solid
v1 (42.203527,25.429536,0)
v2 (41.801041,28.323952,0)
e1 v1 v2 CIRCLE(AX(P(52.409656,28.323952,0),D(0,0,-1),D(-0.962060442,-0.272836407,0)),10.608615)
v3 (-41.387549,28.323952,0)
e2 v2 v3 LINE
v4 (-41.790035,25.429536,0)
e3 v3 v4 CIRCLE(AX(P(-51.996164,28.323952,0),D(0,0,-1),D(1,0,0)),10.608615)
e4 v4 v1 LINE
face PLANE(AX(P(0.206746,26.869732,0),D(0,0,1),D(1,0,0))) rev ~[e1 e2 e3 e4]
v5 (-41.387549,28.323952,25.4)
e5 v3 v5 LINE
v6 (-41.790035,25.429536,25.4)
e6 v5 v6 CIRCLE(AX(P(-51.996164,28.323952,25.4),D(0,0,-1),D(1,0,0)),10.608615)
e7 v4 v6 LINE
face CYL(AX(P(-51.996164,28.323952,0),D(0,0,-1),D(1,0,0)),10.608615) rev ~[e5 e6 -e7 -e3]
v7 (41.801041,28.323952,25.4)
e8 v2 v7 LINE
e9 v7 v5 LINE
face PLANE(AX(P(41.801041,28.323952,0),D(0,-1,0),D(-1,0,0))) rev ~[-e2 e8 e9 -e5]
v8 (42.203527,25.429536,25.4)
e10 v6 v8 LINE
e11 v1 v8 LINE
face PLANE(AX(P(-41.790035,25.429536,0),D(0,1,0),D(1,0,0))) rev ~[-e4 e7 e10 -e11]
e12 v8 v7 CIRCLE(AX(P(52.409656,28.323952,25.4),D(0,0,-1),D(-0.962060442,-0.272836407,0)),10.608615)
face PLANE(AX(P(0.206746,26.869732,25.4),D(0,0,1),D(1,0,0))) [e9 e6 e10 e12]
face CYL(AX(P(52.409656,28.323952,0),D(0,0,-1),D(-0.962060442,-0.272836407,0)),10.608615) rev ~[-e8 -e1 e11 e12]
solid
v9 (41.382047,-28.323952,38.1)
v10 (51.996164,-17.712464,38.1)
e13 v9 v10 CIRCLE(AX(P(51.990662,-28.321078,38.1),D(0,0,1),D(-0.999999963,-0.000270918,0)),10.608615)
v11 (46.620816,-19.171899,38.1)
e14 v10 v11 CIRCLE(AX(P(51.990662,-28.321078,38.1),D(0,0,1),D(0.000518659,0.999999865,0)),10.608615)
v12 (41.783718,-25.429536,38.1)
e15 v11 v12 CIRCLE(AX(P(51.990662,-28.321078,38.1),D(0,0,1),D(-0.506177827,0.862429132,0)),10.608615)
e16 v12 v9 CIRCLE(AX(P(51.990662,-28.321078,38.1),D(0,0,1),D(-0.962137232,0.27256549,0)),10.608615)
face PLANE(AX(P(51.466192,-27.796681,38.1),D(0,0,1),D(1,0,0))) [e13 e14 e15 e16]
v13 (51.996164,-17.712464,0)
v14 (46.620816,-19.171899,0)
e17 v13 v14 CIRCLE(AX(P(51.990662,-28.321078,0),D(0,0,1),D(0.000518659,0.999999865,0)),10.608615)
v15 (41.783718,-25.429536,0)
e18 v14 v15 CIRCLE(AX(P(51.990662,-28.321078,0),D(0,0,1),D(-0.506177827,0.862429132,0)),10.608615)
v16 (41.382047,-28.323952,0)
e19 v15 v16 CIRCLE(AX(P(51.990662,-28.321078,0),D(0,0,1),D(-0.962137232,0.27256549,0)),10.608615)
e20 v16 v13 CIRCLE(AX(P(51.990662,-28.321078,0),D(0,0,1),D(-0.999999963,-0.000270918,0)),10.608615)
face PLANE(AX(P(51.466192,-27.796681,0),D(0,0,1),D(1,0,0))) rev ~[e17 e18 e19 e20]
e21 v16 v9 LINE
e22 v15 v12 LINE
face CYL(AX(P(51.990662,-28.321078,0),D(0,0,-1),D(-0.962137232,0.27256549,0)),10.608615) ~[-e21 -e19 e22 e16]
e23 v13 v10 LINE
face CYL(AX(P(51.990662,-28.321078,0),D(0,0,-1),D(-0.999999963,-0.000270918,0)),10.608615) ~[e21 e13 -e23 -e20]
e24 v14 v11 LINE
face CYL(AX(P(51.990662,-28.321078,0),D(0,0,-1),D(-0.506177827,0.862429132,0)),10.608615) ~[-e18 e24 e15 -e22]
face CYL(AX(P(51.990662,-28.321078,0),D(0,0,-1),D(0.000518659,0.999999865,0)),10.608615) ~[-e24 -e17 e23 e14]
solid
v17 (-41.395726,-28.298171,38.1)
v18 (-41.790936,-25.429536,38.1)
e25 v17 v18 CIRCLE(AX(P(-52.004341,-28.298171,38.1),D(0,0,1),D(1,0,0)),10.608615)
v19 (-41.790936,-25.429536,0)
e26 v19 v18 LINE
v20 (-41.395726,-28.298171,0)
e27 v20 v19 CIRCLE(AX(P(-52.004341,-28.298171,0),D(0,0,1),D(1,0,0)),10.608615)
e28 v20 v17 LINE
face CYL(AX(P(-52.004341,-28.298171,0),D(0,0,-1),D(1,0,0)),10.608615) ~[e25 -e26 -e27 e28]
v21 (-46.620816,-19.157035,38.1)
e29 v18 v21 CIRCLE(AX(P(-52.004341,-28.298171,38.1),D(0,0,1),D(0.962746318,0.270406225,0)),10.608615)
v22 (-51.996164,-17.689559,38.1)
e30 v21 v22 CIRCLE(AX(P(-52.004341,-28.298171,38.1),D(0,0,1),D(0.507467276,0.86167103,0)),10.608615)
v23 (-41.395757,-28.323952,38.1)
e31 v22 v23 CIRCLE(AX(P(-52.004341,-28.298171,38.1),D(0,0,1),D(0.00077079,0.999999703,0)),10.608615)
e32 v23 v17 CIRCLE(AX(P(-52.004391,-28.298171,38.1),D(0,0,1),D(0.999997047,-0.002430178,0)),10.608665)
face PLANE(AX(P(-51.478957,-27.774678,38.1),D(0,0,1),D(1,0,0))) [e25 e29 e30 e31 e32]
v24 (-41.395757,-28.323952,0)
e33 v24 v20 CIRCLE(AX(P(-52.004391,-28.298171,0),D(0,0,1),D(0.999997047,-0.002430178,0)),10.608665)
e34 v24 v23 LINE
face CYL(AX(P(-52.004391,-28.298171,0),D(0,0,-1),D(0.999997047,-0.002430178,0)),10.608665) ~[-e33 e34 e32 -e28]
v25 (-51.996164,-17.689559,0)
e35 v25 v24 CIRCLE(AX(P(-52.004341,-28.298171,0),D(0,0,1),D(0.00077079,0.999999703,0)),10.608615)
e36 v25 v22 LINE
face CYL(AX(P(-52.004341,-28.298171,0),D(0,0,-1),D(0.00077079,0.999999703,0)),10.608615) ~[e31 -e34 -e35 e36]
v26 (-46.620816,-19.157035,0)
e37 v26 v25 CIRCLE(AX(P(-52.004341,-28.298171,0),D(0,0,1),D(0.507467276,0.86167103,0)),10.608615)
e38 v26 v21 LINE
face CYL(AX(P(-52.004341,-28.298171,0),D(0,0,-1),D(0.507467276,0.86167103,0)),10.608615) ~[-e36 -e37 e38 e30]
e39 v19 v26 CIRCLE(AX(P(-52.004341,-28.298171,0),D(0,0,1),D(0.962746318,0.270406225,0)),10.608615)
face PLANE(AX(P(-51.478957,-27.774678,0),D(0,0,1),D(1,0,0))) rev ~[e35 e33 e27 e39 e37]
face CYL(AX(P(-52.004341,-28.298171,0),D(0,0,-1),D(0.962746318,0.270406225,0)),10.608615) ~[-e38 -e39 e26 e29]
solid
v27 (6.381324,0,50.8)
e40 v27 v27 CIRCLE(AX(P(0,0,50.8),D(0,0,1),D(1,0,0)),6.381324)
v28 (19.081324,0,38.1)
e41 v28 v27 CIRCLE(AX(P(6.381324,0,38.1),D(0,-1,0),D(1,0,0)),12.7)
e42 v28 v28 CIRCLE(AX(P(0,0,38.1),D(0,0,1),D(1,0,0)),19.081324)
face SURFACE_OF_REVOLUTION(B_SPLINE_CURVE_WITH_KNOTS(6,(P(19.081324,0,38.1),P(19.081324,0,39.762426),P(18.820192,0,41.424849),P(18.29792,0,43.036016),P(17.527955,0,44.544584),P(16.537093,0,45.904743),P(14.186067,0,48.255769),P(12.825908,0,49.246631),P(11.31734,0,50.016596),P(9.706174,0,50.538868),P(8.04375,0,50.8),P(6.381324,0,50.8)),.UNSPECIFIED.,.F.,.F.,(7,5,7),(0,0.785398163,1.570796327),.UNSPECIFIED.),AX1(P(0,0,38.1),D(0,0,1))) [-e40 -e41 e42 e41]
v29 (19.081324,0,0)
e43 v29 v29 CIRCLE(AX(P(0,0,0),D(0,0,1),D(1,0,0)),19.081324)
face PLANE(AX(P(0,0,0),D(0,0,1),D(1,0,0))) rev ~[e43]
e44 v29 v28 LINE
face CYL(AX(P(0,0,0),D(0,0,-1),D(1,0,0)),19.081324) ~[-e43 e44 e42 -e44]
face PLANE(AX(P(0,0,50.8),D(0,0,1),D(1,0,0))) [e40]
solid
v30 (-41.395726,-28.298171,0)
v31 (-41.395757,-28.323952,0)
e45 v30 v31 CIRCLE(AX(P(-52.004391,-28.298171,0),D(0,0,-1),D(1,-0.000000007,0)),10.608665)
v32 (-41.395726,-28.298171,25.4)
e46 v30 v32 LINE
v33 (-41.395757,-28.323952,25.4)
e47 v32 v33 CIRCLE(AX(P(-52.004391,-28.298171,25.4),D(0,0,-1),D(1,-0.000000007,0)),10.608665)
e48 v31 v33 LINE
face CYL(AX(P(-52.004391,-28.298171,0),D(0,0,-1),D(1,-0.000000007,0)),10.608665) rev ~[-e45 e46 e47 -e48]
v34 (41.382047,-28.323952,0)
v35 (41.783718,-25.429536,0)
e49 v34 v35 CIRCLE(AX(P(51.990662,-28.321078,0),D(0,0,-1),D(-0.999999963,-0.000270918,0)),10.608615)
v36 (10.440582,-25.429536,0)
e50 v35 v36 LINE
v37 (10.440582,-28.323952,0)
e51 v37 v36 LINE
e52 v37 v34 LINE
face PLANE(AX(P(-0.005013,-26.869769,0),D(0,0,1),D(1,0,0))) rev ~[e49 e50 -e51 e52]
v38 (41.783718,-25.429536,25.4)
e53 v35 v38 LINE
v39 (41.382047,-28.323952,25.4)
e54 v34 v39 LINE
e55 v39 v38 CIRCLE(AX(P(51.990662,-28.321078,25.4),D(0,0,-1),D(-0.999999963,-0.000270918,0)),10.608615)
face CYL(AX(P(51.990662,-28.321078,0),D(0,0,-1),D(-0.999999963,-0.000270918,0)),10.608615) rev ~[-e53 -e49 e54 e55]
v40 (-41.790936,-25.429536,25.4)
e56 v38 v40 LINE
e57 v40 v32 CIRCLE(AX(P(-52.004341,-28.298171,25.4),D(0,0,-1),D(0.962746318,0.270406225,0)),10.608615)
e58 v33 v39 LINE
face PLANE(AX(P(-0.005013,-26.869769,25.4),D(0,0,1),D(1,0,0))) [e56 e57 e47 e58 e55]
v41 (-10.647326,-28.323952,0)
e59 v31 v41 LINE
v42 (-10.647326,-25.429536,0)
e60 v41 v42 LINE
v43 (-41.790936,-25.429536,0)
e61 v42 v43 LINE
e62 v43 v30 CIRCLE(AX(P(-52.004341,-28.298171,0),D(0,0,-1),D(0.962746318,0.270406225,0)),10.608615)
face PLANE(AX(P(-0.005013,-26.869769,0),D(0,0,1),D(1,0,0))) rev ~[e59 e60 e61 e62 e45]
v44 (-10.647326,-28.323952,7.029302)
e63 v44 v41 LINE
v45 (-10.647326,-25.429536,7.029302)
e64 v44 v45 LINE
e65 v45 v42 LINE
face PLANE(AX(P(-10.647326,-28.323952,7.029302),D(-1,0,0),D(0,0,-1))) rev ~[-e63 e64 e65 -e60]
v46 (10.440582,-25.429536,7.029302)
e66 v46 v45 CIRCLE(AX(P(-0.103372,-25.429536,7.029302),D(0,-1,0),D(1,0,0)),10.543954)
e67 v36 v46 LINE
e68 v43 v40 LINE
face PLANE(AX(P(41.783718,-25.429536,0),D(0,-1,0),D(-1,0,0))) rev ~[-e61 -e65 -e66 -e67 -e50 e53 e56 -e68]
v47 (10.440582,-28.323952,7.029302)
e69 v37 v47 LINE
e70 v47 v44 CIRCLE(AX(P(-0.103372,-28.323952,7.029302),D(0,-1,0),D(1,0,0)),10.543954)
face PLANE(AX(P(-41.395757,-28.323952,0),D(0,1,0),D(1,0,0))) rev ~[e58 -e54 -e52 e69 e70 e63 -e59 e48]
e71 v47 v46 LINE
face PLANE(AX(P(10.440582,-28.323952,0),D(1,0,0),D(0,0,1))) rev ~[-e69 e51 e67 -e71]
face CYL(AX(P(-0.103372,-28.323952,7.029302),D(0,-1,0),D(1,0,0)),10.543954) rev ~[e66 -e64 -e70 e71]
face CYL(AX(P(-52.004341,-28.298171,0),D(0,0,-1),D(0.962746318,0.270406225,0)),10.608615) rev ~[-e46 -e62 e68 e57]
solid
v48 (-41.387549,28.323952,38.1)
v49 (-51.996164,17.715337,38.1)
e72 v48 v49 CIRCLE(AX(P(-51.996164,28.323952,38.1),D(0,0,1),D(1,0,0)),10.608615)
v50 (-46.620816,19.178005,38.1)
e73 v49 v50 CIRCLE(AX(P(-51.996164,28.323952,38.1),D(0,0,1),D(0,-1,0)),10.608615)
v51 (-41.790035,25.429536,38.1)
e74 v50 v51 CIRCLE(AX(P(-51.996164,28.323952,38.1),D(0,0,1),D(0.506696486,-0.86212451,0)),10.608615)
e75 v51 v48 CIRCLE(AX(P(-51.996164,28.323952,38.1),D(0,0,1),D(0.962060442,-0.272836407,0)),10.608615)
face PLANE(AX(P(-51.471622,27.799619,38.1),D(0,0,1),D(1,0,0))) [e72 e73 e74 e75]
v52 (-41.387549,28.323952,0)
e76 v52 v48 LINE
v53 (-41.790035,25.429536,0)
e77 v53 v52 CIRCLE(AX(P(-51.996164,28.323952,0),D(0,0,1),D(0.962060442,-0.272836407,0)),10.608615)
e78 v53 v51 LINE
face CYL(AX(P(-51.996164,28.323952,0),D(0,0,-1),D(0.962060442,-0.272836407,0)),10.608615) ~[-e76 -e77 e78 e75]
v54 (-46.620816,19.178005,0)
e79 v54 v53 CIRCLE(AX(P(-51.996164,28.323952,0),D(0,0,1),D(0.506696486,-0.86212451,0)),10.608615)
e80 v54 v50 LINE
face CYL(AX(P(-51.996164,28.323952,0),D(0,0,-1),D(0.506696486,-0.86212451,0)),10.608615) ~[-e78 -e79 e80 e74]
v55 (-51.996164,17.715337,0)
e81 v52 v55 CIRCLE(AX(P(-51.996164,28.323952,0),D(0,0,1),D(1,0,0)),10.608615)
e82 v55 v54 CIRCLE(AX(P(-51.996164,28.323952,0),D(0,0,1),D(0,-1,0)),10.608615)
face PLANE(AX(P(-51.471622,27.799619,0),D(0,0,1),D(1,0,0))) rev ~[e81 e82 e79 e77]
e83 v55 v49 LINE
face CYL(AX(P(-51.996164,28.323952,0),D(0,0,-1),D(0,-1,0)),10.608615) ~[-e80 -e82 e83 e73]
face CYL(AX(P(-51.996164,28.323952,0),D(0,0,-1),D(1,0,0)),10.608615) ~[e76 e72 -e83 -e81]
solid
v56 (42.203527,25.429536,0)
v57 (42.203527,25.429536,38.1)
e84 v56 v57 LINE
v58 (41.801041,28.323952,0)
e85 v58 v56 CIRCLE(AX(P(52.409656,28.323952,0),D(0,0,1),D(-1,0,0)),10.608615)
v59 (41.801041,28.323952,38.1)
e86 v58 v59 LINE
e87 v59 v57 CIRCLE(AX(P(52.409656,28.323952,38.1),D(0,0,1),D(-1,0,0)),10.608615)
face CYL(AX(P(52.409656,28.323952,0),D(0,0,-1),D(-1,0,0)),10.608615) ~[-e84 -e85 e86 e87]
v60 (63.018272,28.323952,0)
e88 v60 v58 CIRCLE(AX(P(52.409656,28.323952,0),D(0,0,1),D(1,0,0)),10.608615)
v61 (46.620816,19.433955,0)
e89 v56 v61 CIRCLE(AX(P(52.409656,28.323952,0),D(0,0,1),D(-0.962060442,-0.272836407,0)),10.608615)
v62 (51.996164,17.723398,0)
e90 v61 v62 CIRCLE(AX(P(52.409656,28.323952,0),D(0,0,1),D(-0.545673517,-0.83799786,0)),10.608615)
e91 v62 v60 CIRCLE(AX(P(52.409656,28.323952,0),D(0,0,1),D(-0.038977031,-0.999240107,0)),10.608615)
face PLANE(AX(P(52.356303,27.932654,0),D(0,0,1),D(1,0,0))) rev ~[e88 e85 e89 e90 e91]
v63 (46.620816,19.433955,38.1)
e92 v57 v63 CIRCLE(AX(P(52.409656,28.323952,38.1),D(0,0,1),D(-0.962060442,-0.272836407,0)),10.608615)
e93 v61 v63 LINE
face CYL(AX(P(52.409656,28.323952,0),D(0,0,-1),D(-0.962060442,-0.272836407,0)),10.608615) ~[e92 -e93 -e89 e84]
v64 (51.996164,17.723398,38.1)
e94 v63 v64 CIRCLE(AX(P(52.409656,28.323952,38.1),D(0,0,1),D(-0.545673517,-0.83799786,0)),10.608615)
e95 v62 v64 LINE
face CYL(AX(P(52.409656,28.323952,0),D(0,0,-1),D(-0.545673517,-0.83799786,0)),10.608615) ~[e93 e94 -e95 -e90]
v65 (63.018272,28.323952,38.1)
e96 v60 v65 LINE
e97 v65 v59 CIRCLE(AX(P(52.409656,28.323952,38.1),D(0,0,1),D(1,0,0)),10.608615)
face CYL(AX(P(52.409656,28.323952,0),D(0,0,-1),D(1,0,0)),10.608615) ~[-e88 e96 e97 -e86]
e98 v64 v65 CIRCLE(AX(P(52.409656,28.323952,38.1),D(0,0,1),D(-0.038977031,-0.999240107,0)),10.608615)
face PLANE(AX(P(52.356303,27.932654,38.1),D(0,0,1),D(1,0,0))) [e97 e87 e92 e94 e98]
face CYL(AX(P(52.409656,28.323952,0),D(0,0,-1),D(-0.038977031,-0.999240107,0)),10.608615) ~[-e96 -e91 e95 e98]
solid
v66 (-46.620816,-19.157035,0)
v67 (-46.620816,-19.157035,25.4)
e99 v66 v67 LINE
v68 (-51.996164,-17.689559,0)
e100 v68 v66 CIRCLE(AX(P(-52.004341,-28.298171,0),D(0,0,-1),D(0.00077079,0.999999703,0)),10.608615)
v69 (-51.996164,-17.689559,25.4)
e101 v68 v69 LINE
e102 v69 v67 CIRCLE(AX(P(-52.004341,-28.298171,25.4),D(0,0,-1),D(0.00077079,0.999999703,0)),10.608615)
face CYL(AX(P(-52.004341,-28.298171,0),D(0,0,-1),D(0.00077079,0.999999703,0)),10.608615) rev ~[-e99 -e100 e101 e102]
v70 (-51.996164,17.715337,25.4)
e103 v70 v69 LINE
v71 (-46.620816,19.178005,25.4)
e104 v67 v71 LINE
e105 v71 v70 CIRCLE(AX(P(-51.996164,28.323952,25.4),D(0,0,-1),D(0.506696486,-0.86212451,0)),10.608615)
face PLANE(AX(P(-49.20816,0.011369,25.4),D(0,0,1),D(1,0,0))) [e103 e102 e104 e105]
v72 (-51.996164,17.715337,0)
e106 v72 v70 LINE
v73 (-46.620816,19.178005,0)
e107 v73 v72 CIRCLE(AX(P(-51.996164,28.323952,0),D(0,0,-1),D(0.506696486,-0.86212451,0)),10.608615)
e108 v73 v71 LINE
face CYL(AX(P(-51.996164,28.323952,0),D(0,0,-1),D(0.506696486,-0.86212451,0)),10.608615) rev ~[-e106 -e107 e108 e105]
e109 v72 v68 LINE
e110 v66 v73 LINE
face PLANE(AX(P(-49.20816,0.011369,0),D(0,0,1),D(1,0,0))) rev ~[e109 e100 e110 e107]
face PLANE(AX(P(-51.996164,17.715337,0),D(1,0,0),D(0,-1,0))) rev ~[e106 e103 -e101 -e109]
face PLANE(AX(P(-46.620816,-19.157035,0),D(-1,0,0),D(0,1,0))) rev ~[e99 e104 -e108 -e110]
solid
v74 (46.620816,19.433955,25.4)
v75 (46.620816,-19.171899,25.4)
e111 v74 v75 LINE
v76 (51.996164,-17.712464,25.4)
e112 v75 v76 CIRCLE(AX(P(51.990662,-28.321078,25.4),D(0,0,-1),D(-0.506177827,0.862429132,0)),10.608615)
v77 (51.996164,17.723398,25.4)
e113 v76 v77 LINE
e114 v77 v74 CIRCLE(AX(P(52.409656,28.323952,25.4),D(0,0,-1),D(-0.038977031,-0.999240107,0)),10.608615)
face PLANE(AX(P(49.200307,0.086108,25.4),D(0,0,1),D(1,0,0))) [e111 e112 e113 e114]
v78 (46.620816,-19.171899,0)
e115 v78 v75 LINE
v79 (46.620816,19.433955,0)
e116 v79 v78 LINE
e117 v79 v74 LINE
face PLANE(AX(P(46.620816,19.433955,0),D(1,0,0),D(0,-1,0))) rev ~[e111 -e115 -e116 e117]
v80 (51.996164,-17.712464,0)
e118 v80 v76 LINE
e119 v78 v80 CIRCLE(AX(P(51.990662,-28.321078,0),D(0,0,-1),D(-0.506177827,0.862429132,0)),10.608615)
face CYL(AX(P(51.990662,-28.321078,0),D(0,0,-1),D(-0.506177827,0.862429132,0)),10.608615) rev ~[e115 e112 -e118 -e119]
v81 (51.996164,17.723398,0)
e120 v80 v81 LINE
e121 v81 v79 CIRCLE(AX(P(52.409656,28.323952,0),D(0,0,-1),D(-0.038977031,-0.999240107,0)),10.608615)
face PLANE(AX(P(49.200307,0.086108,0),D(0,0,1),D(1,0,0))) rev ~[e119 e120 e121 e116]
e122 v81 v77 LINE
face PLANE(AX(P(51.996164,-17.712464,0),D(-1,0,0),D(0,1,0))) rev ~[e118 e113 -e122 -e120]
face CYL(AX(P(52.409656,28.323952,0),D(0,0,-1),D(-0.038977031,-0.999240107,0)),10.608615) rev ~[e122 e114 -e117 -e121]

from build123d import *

# Parameters (mm, degrees)
F1_DEPTH = 25.4
F2_DEPTH = 38.1
F0_R     = 19.0813240556
F3_DEPTH = 50.8
F5_DEPTH = 25.4
F6_R     = 12.7


with BuildPart() as f1:
    # F0 (on Top) → F1 (new body)
    with BuildSketch(Plane.XY):
        with BuildLine():
            Line((41.8010411673, 28.3239521086), (-41.3875488453, 28.3239521086))
            ThreePointArc((-41.3875488453, 28.3239521086), (-41.4886521595, 26.8628188405), (-41.7900350118, 25.4295356572))
            Line((-41.7900350118, 25.4295356572), (42.2035273337, 25.4295356572))
            ThreePointArc((42.2035273337, 25.4295356572), (41.9021444815, 26.8628188405), (41.8010411673, 28.3239521086))
        make_face()
    extrude(amount=F1_DEPTH)


with BuildPart() as f1b:
    # F0 (on Top) → F1, piece 2 (new body)
    with BuildSketch(Plane.XY):
        with BuildLine():
            Line((-51.9961640239, 17.7153369301), (-51.9961640239, -17.6895592099))
            ThreePointArc((-51.9961640239, -17.6895592099), (-49.2104219308, -18.0640746947), (-46.6208159924, -19.1570348685))
            Line((-46.6208159924, -19.1570348685), (-46.6208159924, 19.1780049435))
            ThreePointArc((-46.6208159924, 19.1780049435), (-49.2107661987, 18.0875330589), (-51.9961640239, 17.7153369301))
        make_face()
    extrude(amount=F1_DEPTH)


with BuildPart() as f1c:
    # F0 (on Top) → F1, piece 3 (new body)
    with BuildSketch(Plane.XY):
        with BuildLine():
            ThreePointArc((-41.3957258575, -28.2981712371), (-41.3957336891, -28.3110616824), (-41.3957571837, -28.3239521086))
            Line((-41.3957571837, -28.3239521086), (41.3820469809, -28.3239521086))
            ThreePointArc((41.3820469809, -28.3239521086), (41.4827466628, -26.8628475768), (41.7837181231, -25.4295356572))
            Line((41.7837181231, -25.4295356572), (-41.7909358294, -25.4295356572))
            ThreePointArc((-41.7909358294, -25.4295356572), (-41.4949927807, -26.8503054791), (-41.3957258575, -28.2981712371))
        make_face()
    extrude(amount=F1_DEPTH)

    # F4 (on face) → F5 (cut)
    with BuildSketch(Plane.XZ.offset(28.3239521086)):
        with BuildLine():
            Line((-10.6473257765, 7.0293024182), (-10.6473257765, 0))
            Line((-10.6473257765, 0), (10.4405824095, 0))
            Line((10.4405824095, 0), (10.4405824095, 7.0293024182))
            ThreePointArc((10.4405824095, 7.0293024182), (-0.1033716835, 17.5732565112), (-10.6473257765, 7.0293024182))
        make_face()
    extrude(amount=-F5_DEPTH, mode=Mode.SUBTRACT)


with BuildPart() as f1d:
    # F0 (on Top) → F1, piece 4 (new body)
    with BuildSketch(Plane.XY):
        with BuildLine():
            Line((46.6208159924, 19.4339552938), (46.6208159924, -19.1718992682))
            ThreePointArc((46.6208159924, -19.1718992682), (49.210997587, -18.0831005596), (51.9961640239, -17.7124642955))
            Line((51.9961640239, -17.7124642955), (51.9961640239, 17.7233983445))
            ThreePointArc((51.9961640239, 17.7233983445), (49.1927115338, 18.2148481877), (46.6208159924, 19.4339552938))
        make_face()
    extrude(amount=F1_DEPTH)


with BuildPart() as f2:
    # F0 (on Top) → F2 (new body)
    with BuildSketch(Plane.XY):
        with BuildLine():
            ThreePointArc((-41.3875488453, 28.3239521086), (-59.4975877556, 35.8253758404), (-51.9961640239, 17.7153369301))
            ThreePointArc((-51.9961640239, 17.7153369301), (-49.2107661987, 18.0875330589), (-46.6208159924, 19.1780049435))
            ThreePointArc((-46.6208159924, 19.1780049435), (-43.6017601867, 21.8372965586), (-41.7900350118, 25.4295356572))
            ThreePointArc((-41.7900350118, 25.4295356572), (-41.4886521595, 26.8628188405), (-41.3875488453, 28.3239521086))
        make_face()
    extrude(amount=F2_DEPTH)


with BuildPart() as f2b:
    # F0 (on Top) → F2, piece 2 (new body)
    with BuildSketch(Plane.XY):
        with BuildLine():
            ThreePointArc((-51.9961640239, -17.6895592099), (-59.5177610892, -35.7875794321), (-41.3957571837, -28.3239521086))
            ThreePointArc((-41.3957571837, -28.3239521086), (-41.3957336891, -28.3110616824), (-41.3957258575, -28.2981712371))
            ThreePointArc((-41.3957258575, -28.2981712371), (-41.4949927807, -26.8503054791), (-41.7909358294, -25.4295356572))
            ThreePointArc((-41.7909358294, -25.4295356572), (-43.5988592031, -21.8258771182), (-46.6208159924, -19.1570348685))
            ThreePointArc((-46.6208159924, -19.1570348685), (-49.2104219308, -18.0640746947), (-51.9961640239, -17.6895592099))
        make_face()
    extrude(amount=F2_DEPTH)


with BuildPart() as f2c:
    # F0 (on Top) → F2, piece 3 (new body)
    with BuildSketch(Plane.XY):
        with BuildLine():
            ThreePointArc((41.7837181231, -25.4295356572), (41.4827466628, -26.8628475768), (41.3820469809, -28.3239521086))
            ThreePointArc((41.3820469809, -28.3239521086), (51.9920988009, -38.9296931284), (62.5992769487, -28.3210780472))
            ThreePointArc((62.5992769487, -28.3210780472), (59.4940305902, -20.8215999082), (51.9961640239, -17.7124642955))
            ThreePointArc((51.9961640239, -17.7124642955), (49.210997587, -18.0831005596), (46.6208159924, -19.1718992682))
            ThreePointArc((46.6208159924, -19.1718992682), (43.5972956104, -21.8330798569), (41.7837181231, -25.4295356572))
        make_face()
    extrude(amount=F2_DEPTH)


with BuildPart() as f2d:
    # F0 (on Top) → F2, piece 4 (new body)
    with BuildSketch(Plane.XY):
        with BuildLine():
            ThreePointArc((42.2035273337, 25.4295356572), (43.8687836021, 22.0314002589), (46.6208159924, 19.4339552938))
            ThreePointArc((46.6208159924, 19.4339552938), (49.1927115338, 18.2148481877), (51.9961640239, 17.7233983445))
            ThreePointArc((51.9961640239, 17.7233983445), (59.7634354792, 20.6777341896), (63.0182715244, 28.3239521086))
            ThreePointArc((63.0182715244, 28.3239521086), (52.4096563458, 38.9325672872), (41.8010411673, 28.3239521086))
            ThreePointArc((41.8010411673, 28.3239521086), (41.9021444815, 26.8628188405), (42.2035273337, 25.4295356572))
        make_face()
    extrude(amount=F2_DEPTH)


with BuildPart() as f3:
    # F0 (on Top) → F3 (new body)
    with BuildSketch(Plane.XY):
        Circle(F0_R)
    extrude(amount=F3_DEPTH)

    # F6
    f6_edges = [f3.edges().sort_by_distance(p)[0] for p in [
        (-19.081324, 0, 50.8),
    ]]
    fillet(f6_edges, radius=F6_R)


solid = Compound([f1.part, f1b.part, f1c.part, f1d.part, f2.part, f2b.part, f2c.part, f2d.part, f3.part])
